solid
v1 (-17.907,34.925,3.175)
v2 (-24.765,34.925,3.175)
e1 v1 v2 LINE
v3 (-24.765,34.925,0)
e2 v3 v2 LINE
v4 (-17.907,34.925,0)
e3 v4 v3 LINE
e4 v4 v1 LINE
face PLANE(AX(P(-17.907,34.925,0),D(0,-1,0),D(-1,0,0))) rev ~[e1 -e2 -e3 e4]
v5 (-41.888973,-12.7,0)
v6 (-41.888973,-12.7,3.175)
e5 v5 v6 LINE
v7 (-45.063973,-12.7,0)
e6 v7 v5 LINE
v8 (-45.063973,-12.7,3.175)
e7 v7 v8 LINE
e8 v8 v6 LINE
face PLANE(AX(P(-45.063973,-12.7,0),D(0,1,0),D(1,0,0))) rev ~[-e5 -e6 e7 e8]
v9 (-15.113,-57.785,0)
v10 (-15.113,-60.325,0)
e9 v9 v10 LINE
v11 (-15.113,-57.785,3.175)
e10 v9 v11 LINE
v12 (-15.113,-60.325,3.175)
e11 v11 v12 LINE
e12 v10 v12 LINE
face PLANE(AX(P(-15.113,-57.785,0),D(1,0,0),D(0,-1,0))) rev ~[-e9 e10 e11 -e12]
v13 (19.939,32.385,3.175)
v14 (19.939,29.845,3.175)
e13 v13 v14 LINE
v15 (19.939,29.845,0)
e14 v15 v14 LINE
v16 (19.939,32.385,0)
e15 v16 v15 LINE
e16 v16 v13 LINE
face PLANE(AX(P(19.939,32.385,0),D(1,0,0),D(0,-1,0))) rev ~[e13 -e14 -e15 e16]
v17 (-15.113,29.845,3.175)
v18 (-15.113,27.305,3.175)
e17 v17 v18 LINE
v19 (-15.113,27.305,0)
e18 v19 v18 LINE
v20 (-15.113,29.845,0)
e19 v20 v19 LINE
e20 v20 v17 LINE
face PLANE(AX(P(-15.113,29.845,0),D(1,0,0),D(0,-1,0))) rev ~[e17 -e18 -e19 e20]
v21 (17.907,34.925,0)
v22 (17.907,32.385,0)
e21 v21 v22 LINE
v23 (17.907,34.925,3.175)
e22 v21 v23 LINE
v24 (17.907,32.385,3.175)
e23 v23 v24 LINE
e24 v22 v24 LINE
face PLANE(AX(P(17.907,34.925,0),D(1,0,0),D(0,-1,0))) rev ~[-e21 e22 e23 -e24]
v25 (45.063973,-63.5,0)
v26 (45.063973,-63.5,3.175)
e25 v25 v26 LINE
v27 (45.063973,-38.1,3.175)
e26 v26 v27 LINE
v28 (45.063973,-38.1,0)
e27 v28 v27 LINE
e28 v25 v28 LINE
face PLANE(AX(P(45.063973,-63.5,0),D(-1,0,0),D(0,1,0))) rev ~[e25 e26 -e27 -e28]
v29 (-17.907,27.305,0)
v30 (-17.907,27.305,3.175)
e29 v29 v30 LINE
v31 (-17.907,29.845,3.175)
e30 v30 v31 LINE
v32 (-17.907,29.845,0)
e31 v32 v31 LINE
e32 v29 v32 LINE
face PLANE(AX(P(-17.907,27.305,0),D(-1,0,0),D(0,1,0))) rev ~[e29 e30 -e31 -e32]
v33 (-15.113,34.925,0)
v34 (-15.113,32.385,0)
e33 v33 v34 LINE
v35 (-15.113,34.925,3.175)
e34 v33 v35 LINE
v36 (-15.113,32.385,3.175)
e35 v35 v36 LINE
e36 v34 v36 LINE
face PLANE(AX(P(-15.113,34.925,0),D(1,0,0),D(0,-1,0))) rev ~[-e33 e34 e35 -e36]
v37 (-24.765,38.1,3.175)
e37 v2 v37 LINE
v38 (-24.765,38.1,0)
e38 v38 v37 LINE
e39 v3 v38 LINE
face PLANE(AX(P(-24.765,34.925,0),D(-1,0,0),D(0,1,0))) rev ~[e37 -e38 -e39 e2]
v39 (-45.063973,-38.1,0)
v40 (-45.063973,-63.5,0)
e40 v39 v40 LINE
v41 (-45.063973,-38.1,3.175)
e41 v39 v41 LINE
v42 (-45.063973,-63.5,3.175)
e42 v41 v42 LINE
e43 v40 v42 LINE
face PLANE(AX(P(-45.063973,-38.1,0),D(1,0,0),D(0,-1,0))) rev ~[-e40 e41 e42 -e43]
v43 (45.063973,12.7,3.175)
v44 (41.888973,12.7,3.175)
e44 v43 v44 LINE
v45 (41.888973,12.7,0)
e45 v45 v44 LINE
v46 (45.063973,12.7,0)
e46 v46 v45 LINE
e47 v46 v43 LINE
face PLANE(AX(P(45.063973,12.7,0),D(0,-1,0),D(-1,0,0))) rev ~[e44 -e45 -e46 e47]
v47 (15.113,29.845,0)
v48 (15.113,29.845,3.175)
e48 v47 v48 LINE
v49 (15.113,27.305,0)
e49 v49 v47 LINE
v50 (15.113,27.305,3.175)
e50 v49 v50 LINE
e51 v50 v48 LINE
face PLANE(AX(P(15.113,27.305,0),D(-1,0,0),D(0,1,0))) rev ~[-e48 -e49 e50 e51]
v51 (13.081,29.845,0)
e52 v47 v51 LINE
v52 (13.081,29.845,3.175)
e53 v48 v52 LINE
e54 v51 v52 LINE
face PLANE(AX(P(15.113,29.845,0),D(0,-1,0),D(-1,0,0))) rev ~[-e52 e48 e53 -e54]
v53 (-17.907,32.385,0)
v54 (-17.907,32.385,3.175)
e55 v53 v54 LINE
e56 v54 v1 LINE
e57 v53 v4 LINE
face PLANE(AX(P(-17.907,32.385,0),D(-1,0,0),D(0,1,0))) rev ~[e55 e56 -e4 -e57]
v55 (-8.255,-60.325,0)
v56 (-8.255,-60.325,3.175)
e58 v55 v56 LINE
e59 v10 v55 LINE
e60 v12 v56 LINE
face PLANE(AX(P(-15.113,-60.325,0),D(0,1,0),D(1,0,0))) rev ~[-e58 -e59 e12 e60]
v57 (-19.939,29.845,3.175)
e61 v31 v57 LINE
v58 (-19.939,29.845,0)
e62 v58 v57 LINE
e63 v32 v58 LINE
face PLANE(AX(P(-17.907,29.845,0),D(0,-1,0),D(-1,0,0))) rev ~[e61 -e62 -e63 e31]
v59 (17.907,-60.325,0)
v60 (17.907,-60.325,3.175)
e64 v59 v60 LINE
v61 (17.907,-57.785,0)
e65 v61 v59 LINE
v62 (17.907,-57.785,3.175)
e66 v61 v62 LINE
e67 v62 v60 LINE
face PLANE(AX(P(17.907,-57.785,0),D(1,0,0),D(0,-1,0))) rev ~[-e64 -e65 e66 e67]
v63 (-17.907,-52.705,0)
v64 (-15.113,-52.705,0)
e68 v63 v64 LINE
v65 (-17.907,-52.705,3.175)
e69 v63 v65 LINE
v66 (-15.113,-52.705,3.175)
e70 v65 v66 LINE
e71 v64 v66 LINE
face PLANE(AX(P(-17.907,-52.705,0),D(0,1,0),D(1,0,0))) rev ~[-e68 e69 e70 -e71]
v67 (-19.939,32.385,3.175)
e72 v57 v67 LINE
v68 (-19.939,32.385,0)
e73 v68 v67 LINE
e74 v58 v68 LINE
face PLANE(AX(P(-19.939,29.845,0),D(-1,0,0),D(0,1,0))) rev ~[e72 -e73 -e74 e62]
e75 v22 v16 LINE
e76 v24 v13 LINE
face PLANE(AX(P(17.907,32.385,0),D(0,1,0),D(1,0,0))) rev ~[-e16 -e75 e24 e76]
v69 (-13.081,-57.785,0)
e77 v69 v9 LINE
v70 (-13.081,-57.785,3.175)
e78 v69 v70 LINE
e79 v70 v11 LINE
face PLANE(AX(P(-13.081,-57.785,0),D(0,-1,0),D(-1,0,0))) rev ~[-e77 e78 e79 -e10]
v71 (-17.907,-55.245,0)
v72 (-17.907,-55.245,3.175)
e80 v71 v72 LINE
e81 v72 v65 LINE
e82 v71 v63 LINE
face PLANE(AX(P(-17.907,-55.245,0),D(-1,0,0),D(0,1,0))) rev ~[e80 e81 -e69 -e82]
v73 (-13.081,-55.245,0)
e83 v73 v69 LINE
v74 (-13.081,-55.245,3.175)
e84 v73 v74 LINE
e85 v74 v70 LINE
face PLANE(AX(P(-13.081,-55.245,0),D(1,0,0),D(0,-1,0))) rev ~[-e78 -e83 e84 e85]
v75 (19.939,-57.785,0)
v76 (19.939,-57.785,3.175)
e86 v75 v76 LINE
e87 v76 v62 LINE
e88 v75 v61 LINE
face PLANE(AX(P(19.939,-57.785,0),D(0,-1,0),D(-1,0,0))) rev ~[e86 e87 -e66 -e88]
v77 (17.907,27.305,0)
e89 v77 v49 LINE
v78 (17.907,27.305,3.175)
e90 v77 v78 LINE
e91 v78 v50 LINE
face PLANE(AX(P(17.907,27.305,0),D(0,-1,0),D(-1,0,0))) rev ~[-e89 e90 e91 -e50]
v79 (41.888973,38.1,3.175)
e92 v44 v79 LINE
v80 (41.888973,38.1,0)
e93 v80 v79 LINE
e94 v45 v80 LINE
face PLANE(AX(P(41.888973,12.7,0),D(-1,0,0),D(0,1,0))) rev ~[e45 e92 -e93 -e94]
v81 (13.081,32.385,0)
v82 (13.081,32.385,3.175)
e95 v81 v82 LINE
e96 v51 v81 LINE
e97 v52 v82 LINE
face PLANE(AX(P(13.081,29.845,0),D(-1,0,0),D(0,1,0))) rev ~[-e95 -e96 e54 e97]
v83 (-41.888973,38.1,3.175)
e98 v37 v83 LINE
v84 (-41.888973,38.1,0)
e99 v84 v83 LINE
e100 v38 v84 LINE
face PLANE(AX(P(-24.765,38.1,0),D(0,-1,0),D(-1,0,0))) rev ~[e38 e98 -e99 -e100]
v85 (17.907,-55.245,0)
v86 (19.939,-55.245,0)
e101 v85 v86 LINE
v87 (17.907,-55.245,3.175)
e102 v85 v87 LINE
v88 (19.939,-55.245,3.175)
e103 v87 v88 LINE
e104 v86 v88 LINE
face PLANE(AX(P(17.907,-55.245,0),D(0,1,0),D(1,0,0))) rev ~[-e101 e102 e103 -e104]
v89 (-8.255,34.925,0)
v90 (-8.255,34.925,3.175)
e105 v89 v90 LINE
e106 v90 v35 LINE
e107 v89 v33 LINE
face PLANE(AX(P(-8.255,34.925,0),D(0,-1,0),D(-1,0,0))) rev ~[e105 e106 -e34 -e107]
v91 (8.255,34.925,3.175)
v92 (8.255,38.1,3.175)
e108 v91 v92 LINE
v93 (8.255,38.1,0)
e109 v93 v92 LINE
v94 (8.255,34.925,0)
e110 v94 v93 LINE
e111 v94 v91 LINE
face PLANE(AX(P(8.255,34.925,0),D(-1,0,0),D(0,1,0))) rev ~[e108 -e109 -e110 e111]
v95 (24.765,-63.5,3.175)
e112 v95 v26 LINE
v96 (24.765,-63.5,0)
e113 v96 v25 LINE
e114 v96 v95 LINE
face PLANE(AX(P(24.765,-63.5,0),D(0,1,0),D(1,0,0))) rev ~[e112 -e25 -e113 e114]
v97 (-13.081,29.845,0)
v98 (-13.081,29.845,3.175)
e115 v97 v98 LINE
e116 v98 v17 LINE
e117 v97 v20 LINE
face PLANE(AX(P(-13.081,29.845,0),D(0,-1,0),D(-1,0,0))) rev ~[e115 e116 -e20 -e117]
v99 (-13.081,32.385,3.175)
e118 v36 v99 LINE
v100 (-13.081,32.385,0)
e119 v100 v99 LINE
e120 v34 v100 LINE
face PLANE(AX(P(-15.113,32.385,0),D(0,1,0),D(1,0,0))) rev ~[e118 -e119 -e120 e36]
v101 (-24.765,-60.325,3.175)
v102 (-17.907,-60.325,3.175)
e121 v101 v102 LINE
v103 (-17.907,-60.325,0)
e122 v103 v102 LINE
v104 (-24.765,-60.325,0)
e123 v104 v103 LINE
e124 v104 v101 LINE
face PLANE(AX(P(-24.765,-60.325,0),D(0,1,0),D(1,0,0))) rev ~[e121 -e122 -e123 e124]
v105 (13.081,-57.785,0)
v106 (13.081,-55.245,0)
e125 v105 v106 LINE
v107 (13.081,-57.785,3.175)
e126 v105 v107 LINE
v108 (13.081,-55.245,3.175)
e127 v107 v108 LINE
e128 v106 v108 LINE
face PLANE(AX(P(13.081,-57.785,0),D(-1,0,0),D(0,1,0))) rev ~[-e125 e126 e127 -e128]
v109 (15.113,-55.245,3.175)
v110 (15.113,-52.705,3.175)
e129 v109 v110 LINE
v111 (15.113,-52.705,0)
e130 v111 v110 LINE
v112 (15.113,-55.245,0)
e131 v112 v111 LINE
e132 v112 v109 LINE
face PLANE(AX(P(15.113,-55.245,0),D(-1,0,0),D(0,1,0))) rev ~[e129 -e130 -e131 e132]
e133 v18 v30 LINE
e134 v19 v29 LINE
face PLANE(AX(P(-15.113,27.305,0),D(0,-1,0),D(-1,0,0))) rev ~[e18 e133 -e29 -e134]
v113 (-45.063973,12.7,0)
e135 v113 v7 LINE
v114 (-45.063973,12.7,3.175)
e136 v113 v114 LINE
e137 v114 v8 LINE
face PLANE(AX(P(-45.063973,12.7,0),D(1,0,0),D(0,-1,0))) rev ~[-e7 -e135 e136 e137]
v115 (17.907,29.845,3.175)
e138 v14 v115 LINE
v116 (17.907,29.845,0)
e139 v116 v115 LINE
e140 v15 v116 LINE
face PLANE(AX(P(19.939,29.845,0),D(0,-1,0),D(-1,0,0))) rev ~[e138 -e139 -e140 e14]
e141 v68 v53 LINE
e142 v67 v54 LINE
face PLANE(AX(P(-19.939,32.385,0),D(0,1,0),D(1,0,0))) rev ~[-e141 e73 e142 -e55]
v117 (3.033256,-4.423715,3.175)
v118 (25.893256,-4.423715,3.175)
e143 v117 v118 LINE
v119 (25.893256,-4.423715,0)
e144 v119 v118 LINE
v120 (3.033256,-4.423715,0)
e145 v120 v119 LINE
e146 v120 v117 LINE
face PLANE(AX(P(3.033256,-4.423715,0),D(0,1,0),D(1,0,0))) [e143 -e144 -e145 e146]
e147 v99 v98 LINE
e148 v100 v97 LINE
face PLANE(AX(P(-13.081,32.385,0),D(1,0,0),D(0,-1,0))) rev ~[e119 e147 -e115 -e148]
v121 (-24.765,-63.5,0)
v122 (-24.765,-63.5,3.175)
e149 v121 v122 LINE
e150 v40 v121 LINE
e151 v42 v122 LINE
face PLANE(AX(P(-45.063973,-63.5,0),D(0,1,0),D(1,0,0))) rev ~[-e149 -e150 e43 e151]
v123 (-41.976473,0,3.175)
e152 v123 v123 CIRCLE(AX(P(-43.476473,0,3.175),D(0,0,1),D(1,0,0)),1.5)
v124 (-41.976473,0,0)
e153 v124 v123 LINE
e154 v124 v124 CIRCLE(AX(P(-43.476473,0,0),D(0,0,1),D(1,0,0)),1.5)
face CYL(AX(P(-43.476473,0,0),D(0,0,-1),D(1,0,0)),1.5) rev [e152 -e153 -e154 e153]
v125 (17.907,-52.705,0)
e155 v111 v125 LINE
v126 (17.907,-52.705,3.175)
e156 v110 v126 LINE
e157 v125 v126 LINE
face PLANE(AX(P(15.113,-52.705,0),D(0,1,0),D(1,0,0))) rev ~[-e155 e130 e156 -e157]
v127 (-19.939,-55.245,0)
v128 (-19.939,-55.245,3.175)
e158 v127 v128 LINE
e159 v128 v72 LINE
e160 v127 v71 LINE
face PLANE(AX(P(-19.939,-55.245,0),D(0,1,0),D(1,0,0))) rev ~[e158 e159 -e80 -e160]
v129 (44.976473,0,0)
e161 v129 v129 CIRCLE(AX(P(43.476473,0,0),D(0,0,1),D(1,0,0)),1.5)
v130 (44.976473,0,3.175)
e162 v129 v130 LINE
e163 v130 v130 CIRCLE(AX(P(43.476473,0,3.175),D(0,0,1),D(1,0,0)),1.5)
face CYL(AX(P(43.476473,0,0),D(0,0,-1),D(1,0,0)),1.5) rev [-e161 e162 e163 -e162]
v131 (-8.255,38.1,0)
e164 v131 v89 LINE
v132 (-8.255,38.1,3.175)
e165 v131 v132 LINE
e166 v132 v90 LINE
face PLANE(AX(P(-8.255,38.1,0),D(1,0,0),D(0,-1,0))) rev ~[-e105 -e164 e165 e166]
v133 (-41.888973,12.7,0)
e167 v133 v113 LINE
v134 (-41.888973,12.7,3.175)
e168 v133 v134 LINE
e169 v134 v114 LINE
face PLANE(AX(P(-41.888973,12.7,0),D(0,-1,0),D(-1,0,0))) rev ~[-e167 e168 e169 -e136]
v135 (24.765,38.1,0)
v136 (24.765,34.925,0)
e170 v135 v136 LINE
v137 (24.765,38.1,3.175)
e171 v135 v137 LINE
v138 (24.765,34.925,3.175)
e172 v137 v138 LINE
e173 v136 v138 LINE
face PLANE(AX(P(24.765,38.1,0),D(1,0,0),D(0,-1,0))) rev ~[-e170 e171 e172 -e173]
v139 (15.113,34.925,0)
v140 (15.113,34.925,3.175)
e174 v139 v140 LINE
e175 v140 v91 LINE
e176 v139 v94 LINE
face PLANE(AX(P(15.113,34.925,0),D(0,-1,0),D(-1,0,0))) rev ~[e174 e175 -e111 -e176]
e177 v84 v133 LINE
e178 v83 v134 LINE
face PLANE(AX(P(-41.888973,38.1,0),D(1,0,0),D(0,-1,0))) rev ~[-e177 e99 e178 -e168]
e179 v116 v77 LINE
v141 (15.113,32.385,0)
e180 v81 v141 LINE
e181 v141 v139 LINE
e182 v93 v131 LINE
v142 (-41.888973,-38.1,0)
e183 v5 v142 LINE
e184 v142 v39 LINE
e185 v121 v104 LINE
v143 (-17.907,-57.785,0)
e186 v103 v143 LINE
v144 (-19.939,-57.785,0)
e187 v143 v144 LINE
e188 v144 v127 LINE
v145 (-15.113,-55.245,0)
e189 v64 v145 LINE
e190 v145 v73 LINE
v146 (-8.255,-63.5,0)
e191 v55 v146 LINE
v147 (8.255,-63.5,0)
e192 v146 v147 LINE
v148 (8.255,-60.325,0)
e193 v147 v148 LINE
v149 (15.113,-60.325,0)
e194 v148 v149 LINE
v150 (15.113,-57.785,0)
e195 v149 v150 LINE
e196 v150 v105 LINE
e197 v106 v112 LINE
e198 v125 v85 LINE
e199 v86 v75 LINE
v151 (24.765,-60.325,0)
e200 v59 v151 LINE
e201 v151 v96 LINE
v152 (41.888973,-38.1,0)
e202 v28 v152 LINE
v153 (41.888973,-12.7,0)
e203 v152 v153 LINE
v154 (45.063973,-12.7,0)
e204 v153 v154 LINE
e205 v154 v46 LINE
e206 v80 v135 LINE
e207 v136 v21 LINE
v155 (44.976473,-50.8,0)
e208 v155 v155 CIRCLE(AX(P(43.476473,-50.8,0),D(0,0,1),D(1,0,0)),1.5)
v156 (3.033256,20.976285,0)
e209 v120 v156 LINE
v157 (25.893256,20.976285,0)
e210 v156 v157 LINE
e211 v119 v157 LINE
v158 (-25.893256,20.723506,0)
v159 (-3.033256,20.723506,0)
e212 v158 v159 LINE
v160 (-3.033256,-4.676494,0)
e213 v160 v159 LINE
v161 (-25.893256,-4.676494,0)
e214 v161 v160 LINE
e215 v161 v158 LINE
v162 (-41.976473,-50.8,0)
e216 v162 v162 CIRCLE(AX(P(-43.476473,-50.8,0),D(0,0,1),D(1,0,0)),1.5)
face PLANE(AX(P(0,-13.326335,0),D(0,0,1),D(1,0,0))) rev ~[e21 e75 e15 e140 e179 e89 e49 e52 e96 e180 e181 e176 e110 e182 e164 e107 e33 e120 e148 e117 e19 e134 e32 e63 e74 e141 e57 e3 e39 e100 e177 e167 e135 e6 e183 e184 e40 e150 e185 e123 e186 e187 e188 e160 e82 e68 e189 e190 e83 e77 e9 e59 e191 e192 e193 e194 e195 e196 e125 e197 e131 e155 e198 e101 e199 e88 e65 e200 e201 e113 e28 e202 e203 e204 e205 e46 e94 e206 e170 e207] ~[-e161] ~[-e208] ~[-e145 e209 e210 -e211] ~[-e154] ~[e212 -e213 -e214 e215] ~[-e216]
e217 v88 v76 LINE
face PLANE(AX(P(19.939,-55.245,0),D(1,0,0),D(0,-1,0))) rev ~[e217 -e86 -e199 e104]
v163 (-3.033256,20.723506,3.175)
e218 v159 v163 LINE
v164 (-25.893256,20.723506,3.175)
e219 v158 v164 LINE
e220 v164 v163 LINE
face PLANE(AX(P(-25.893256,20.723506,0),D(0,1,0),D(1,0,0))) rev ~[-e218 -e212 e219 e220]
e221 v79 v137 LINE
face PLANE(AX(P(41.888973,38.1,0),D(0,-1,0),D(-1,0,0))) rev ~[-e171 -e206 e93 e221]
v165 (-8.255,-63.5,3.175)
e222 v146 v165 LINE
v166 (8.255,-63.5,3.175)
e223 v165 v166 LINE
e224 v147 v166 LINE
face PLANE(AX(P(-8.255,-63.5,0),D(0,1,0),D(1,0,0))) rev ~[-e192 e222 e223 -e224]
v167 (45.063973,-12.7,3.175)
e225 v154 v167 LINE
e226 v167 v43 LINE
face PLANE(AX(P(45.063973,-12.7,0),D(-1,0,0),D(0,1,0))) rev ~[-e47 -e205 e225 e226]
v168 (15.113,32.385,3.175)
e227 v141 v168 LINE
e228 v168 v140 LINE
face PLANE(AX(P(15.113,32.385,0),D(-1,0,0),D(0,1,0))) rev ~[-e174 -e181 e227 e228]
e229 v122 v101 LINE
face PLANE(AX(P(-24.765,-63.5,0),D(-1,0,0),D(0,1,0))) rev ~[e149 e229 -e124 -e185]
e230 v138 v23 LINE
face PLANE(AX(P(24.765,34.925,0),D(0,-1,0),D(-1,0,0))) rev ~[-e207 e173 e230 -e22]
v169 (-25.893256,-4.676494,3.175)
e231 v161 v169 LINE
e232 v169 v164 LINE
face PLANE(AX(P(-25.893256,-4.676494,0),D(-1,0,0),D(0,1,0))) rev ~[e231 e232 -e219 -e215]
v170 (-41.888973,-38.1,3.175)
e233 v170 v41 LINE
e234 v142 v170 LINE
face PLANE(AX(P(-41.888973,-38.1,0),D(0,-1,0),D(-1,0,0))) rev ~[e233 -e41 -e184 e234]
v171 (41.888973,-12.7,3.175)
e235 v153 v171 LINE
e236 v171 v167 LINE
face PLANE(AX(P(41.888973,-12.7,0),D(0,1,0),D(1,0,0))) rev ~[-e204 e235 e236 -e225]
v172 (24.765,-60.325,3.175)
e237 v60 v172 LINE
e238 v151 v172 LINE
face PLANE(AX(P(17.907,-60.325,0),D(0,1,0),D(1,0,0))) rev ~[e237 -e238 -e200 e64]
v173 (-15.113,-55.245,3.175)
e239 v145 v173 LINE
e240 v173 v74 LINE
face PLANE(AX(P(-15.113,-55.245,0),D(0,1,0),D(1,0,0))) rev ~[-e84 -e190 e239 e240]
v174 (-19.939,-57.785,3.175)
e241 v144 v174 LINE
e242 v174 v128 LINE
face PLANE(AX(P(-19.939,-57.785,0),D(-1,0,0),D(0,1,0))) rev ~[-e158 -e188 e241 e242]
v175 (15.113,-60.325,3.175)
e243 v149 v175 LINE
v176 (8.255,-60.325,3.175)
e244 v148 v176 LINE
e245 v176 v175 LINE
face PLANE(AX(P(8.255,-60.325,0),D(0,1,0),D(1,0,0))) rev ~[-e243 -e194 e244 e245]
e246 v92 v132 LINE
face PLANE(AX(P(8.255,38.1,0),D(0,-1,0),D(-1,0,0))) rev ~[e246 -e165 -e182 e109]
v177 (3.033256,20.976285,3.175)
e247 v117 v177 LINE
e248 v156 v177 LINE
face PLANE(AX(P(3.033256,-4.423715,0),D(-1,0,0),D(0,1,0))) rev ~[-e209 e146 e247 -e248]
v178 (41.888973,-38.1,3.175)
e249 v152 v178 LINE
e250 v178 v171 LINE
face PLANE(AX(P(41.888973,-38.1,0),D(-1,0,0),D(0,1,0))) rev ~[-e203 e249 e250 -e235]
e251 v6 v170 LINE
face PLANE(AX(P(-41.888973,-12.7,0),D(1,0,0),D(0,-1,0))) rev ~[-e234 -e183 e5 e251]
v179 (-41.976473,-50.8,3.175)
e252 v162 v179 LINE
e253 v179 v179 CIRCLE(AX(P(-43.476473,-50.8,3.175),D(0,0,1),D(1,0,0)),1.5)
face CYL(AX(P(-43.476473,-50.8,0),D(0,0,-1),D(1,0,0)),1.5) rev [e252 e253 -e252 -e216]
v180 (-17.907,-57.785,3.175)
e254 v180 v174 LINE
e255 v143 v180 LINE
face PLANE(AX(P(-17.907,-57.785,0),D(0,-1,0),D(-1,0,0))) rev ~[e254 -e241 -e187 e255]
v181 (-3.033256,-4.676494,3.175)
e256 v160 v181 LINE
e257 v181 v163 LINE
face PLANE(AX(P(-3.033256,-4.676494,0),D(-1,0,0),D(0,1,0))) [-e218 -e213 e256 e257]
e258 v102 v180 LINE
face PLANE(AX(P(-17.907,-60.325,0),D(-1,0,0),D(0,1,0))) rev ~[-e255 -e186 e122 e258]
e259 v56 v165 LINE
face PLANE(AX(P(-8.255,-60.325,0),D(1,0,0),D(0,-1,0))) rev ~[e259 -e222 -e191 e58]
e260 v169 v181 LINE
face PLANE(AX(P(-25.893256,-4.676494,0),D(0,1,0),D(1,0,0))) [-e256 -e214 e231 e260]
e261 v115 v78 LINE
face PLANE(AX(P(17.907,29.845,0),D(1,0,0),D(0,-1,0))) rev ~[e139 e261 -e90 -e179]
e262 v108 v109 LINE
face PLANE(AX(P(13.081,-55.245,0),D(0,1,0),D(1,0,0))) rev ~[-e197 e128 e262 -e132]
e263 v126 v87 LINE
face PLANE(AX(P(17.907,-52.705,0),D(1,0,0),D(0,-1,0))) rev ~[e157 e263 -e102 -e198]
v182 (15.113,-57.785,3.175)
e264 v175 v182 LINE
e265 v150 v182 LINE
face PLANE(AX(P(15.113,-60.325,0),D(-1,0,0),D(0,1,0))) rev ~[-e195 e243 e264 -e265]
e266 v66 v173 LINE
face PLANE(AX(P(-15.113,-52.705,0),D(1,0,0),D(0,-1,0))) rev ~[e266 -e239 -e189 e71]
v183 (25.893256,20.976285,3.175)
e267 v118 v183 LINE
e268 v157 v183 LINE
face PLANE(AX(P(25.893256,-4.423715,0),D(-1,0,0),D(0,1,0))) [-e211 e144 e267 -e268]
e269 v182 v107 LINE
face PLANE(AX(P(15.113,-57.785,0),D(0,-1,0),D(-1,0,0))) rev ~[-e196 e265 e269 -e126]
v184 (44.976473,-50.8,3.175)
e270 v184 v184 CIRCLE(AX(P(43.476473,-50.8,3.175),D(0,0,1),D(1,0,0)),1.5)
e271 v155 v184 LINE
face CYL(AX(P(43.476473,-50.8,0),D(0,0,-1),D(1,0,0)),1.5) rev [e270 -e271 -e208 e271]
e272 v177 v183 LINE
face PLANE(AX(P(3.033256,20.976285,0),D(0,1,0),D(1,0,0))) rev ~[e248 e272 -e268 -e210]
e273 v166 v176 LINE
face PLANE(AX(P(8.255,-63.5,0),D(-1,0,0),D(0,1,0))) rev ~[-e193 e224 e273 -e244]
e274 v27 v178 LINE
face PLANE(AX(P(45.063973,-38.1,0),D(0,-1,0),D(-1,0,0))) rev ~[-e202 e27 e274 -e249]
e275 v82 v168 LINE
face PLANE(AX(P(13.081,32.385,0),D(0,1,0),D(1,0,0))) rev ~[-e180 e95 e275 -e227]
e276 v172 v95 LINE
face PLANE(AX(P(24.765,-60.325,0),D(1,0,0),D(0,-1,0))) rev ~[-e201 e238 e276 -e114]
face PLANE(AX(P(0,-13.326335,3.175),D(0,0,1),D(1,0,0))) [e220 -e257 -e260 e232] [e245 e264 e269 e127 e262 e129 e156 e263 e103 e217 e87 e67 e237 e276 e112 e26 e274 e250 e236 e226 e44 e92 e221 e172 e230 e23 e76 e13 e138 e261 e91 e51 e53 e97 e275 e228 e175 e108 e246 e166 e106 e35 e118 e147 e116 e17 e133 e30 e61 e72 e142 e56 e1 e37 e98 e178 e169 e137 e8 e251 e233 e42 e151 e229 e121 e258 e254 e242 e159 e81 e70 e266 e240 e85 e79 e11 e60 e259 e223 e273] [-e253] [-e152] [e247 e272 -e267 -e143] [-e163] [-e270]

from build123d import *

# Parameters (mm, degrees)
F0_R     = 1.5
F0_W     = 22.86
F0_H     = 25.4
F1_DEPTH = 3.175


# Not quite as in the source:
# - a length typed as a fraction of an inch, garbled in the dataset ("3 / 203.2 mm" for 3/8 in), is restored


with BuildPart() as f1:
    # F0 (on Top) → F1 (new body)
    with BuildSketch(Plane.XY):
        Polygon((-41.8889727067, -63.5), (-24.765, -63.5), (-24.765, -60.325), (-17.907, -60.325), (-17.907, -57.785), (-19.939, -57.785), (-19.939, -55.245), (-17.907, -55.245), (-17.907, -52.705), (-15.113, -52.705), (-15.113, -55.245), (-13.081, -55.245), (-13.081, -57.785), (-15.113, -57.785), (-15.113, -60.325), (-8.255, -60.325), (-8.255, -63.5), (8.255, -63.5), (8.255, -60.325), (15.113, -60.325), (15.113, -57.785), (13.081, -57.785), (13.081, -55.245), (15.113, -55.245), (15.113, -52.705), (17.907, -52.705), (17.907, -55.245), (19.939, -55.245), (19.939, -57.785), (17.907, -57.785), (17.907, -60.325), (24.765, -60.325), (24.765, -63.5), (41.8889727067, -63.5), (41.91, -63.5), (45.0639727067, -63.5), (45.0639727067, -38.1), (41.8889727067, -38.1), (41.8889727067, -12.7), (45.0639727067, -12.7), (45.0639727067, 12.7), (41.8889727067, 12.7), (41.8889727067, 38.1), (24.765, 38.1), (24.765, 34.925), (17.907, 34.925), (17.907, 32.385), (19.939, 32.385), (19.939, 29.845), (17.907, 29.845), (17.907, 27.305), (15.113, 27.305), (15.113, 29.845), (13.081, 29.845), (13.081, 32.385), (15.113, 32.385), (15.113, 34.925), (8.255, 34.925), (8.255, 38.1), (-8.255, 38.1), (-8.255, 34.925), (-15.113, 34.925), (-15.113, 32.385), (-13.081, 32.385), (-13.081, 29.845), (-15.113, 29.845), (-15.113, 27.305), (-17.907, 27.305), (-17.907, 29.845), (-19.939, 29.845), (-19.939, 32.385), (-17.907, 32.385), (-17.907, 34.925), (-24.765, 34.925), (-24.765, 38.1), (-41.8889727067, 38.1), (-41.8889727067, 12.7), (-45.0639727067, 12.7), (-45.0639727067, -12.7), (-41.8889727067, -12.7), (-41.8889727067, -38.1), (-45.0639727067, -38.1), (-45.0639727067, -63.5), (-41.91, -63.5), align=None)
        with Locations((-43.4764727067, -50.8)):
            Circle(F0_R, mode=Mode.SUBTRACT)
        with Locations((43.4764727067, -50.8)):
            Circle(F0_R, mode=Mode.SUBTRACT)
        with Locations((-43.4764727067, 0)):
            Circle(F0_R, mode=Mode.SUBTRACT)
        with Locations((-14.4632559413, 8.0235061839)):
            Rectangle(F0_W, F0_H, mode=Mode.SUBTRACT)
        with Locations((14.4632559413, 8.2762846043)):
            Rectangle(F0_W, F0_H, mode=Mode.SUBTRACT)
        with Locations((43.4764727067, 0)):
            Circle(F0_R, mode=Mode.SUBTRACT)
    extrude(amount=F1_DEPTH)


solid = f1.part
